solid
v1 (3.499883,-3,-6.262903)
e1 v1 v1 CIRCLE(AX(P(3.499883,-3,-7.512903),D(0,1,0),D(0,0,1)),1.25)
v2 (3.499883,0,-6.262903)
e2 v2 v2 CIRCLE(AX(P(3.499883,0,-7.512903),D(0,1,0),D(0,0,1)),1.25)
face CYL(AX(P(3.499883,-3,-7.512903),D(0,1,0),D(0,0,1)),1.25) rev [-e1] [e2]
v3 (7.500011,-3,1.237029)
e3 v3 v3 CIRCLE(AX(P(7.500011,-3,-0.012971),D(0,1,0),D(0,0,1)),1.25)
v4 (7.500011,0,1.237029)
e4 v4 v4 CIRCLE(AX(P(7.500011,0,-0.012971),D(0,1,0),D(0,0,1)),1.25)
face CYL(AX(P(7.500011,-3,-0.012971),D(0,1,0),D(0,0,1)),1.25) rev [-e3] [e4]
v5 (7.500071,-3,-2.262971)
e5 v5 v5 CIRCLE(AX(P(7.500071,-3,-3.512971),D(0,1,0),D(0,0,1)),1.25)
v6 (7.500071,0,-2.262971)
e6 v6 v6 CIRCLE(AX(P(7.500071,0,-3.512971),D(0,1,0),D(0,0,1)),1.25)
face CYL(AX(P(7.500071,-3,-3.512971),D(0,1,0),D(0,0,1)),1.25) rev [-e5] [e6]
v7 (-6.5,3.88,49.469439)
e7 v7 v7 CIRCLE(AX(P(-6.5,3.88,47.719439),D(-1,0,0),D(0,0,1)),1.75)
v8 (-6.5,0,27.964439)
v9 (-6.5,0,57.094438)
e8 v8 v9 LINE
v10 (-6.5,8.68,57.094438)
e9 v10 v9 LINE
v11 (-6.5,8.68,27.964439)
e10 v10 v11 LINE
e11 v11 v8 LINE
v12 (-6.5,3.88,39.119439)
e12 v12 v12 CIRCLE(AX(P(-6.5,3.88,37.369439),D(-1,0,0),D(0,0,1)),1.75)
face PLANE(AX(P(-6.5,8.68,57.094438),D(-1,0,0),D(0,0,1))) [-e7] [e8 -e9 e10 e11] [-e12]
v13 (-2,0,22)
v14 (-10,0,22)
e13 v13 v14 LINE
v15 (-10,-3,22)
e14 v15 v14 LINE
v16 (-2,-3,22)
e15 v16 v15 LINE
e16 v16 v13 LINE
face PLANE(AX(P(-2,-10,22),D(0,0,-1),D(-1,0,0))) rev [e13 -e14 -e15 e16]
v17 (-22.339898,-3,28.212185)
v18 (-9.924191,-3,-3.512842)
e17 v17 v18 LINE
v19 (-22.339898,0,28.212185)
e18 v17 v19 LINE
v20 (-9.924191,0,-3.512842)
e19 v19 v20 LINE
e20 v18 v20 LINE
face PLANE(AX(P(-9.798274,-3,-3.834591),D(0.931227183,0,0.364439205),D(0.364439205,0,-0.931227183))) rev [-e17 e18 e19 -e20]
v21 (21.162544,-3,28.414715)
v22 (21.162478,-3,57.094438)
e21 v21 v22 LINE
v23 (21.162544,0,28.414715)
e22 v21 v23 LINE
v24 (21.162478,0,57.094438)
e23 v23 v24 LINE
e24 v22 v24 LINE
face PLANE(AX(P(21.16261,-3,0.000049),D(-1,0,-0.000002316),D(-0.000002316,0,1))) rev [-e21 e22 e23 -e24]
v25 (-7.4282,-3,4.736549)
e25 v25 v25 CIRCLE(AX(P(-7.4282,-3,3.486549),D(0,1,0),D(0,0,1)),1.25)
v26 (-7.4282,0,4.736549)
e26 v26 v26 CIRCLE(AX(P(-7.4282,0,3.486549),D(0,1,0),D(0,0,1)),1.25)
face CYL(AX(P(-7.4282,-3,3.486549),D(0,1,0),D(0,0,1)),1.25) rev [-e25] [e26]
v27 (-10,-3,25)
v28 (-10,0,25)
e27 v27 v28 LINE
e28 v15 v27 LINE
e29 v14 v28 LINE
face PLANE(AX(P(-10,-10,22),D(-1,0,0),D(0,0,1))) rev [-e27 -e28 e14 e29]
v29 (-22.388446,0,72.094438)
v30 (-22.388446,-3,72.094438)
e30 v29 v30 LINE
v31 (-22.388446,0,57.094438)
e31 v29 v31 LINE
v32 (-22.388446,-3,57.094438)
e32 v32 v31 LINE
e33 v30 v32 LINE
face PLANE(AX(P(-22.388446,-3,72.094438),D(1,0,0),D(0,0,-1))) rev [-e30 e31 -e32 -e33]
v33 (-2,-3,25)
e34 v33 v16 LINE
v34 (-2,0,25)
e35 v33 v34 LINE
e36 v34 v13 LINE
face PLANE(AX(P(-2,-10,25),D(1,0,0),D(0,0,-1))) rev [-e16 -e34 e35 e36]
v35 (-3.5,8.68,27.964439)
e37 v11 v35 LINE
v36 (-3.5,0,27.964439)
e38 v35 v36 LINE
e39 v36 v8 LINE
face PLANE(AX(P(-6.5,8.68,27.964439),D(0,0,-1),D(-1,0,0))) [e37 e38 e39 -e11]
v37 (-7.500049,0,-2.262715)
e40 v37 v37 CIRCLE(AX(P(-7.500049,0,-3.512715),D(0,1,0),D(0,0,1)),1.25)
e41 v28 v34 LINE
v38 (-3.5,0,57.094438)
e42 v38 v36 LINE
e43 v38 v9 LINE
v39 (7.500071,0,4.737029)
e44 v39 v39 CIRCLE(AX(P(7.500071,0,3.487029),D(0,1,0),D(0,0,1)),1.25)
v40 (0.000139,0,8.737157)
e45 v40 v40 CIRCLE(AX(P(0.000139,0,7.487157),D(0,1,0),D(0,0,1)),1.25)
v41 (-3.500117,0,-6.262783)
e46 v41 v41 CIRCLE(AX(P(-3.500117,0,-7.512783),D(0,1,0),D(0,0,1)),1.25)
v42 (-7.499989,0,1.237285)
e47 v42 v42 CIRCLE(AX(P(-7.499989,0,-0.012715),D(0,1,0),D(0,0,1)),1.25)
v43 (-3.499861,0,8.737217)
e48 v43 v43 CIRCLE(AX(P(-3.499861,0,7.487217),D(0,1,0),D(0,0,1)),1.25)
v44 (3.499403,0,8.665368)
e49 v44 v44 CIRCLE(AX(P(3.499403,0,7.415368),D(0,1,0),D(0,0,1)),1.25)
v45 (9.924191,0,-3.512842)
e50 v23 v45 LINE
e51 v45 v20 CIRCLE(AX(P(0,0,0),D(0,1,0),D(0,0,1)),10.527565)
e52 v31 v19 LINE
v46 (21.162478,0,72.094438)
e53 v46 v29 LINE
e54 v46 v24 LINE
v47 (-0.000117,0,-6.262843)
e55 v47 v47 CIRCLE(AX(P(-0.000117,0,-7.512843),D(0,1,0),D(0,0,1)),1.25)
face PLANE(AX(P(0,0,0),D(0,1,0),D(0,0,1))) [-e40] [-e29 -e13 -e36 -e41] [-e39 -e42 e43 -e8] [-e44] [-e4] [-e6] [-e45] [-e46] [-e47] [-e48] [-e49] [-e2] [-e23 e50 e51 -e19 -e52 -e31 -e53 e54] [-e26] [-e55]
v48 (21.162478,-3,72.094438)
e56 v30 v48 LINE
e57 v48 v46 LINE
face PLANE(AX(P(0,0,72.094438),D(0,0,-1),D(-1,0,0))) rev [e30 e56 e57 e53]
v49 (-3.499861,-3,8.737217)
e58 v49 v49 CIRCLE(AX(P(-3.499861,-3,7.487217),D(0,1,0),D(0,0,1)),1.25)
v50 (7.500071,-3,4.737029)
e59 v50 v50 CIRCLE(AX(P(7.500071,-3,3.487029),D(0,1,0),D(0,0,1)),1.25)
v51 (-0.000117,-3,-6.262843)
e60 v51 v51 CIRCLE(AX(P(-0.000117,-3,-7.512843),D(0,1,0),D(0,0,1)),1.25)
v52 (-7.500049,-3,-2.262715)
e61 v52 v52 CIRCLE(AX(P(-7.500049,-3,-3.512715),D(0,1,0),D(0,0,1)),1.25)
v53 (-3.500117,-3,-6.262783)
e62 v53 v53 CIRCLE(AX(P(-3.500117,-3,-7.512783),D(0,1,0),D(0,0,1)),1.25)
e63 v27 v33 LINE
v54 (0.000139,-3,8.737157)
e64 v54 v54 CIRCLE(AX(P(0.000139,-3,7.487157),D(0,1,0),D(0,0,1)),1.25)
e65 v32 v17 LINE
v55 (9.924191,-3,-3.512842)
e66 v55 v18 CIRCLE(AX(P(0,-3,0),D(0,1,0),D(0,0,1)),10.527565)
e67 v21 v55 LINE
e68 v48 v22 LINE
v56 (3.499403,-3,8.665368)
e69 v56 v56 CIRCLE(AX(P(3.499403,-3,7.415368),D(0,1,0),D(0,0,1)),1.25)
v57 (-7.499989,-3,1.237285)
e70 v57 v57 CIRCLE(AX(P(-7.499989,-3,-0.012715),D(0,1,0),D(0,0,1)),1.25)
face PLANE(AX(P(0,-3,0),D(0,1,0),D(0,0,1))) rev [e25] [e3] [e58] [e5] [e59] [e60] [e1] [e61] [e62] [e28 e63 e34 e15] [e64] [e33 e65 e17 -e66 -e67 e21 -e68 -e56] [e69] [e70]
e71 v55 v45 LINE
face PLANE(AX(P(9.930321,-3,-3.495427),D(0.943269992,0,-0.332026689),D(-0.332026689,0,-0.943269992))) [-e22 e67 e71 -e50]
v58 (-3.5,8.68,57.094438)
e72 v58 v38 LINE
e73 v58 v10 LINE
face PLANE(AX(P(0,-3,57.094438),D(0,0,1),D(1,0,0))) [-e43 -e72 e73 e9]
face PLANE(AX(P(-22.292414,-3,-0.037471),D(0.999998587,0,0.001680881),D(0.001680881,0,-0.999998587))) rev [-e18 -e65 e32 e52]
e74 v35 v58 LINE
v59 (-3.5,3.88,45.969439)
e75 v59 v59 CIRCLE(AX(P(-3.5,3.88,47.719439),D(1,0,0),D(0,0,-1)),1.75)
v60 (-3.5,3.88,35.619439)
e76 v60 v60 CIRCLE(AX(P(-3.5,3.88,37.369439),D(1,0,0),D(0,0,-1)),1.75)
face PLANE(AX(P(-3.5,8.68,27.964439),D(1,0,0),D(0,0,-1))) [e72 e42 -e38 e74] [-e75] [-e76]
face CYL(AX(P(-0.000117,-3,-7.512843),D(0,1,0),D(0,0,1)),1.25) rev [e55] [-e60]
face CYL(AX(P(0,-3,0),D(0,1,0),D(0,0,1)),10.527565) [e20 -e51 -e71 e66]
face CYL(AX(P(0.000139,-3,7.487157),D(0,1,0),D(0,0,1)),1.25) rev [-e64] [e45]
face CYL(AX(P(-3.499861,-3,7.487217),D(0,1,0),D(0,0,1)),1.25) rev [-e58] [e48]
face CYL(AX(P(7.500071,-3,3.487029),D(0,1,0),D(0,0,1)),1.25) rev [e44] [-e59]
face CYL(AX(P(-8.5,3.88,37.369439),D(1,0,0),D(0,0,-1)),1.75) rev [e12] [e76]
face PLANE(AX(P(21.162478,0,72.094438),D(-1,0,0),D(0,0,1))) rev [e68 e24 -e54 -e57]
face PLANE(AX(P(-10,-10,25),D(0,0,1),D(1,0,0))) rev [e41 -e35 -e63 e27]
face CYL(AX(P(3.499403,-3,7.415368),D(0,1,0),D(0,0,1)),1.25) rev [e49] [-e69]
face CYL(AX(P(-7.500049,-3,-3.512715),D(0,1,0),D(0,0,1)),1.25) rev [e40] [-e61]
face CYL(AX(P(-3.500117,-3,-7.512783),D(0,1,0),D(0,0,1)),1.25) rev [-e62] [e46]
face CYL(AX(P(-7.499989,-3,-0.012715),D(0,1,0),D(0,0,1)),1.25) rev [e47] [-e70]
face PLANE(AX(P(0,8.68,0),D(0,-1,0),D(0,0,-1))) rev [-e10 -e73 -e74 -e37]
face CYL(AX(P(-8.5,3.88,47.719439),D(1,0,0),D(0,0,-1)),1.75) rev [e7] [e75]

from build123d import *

# Parameters (mm, degrees)
SKETCH2_R           = 1.25
BOSS_EXTRUDE1_DEPTH = 3
SKETCH6_W           = 3
SKETCH6_H           = 29.12999922
BOSS_EXTRUDE3_DEPTH = 11.68
SKETCH9_R           = 1.75
CUT_EXTRUDE2_DEPTH  = 5
BOSS_EXTRUDE4_DEPTH = 15
SKETCH11_W          = 8
SKETCH11_H          = 3
CUT_EXTRUDE4_DEPTH  = 10


with BuildPart() as part:
    # Sketch2 → Boss-Extrude1 (new body)
    with BuildSketch(Plane(origin=(0, 0, 0), x_dir=(1, 0, 0), z_dir=(0, 1, 0))):
        with BuildLine():
            ThreePointArc((9.924191255, 3.512841719), (0, 10.527565199), (-9.924191255, 3.512841719))
            Line((-9.924191255, 3.512841719), (-22.339897891, -28.212185032))
            Line((-22.339897891, -28.212185032), (-22.388445596, -57.094438481))
            Line((-22.388445596, -57.094438481), (21.162477615, -57.094438481))
            Line((21.162477615, -57.094438481), (21.162544036, -28.414715022))
            Line((21.162544036, -28.414715022), (9.924191255, 3.512841719))
        make_face()
        with Locations((-3.499861001, -7.487216855)):
            Circle(SKETCH2_R, mode=Mode.SUBTRACT)
        with Locations((-7.42819985, -3.486548919)):
            Circle(SKETCH2_R, mode=Mode.SUBTRACT)
        with Locations((-7.499989222, 0.012714758)):
            Circle(SKETCH2_R, mode=Mode.SUBTRACT)
        with Locations((-7.500049059, 3.512714758)):
            Circle(SKETCH2_R, mode=Mode.SUBTRACT)
        with Locations((-3.500117445, 7.512783142)):
            Circle(SKETCH2_R, mode=Mode.SUBTRACT)
        with Locations((0.000138999, -7.487157018)):
            Circle(SKETCH2_R, mode=Mode.SUBTRACT)
        with Locations((3.499402676, -7.415367646)):
            Circle(SKETCH2_R, mode=Mode.SUBTRACT)
        with Locations((7.500070612, -3.487028797)):
            Circle(SKETCH2_R, mode=Mode.SUBTRACT)
        with Locations((7.500010775, 0.012971203)):
            Circle(SKETCH2_R, mode=Mode.SUBTRACT)
        with Locations((-0.000117446, 7.512842979)):
            Circle(SKETCH2_R, mode=Mode.SUBTRACT)
        with Locations((3.499882554, 7.512902816)):
            Circle(SKETCH2_R, mode=Mode.SUBTRACT)
        with Locations((7.500070612, 3.512971202)):
            Circle(SKETCH2_R, mode=Mode.SUBTRACT)
    extrude(amount=-BOSS_EXTRUDE1_DEPTH)

    # Sketch6 → Boss-Extrude3 (add)
    with BuildSketch(Plane.XZ.offset(3)):
        with Locations((-5, 42.529438871)):
            Rectangle(SKETCH6_W, SKETCH6_H)
    extrude(amount=-BOSS_EXTRUDE3_DEPTH)

    # Sketch9 → Cut-Extrude2 (cut)
    with BuildSketch(Plane(origin=(-3.5, 0, 0), x_dir=(0, 0, -1), z_dir=(1, 0, 0))):
        with Locations((-37.369439261, 3.88)):
            Circle(SKETCH9_R)
        with Locations((-47.719439261, 3.88)):
            Circle(SKETCH9_R)
    extrude(amount=-CUT_EXTRUDE2_DEPTH, mode=Mode.SUBTRACT)

    # Sketch10 → Boss-Extrude4 (add)
    with BuildSketch(Plane.XY.offset(57.094438481)):
        Polygon((-22.388445596, 0), (-6.5, 0), (-3.5, 0), (21.162477615, 0), (21.162477615, -3), (-22.388445596, -3), align=None)
    extrude(amount=BOSS_EXTRUDE4_DEPTH)

    # Sketch11 → Cut-Extrude4 (cut)
    with BuildSketch(Plane(origin=(0, 0, 0), x_dir=(1, 0, 0), z_dir=(0, 1, 0))):
        with Locations((-6, -23.5)):
            Rectangle(SKETCH11_W, SKETCH11_H)
    extrude(amount=-CUT_EXTRUDE4_DEPTH, mode=Mode.SUBTRACT)


solid = part.part
